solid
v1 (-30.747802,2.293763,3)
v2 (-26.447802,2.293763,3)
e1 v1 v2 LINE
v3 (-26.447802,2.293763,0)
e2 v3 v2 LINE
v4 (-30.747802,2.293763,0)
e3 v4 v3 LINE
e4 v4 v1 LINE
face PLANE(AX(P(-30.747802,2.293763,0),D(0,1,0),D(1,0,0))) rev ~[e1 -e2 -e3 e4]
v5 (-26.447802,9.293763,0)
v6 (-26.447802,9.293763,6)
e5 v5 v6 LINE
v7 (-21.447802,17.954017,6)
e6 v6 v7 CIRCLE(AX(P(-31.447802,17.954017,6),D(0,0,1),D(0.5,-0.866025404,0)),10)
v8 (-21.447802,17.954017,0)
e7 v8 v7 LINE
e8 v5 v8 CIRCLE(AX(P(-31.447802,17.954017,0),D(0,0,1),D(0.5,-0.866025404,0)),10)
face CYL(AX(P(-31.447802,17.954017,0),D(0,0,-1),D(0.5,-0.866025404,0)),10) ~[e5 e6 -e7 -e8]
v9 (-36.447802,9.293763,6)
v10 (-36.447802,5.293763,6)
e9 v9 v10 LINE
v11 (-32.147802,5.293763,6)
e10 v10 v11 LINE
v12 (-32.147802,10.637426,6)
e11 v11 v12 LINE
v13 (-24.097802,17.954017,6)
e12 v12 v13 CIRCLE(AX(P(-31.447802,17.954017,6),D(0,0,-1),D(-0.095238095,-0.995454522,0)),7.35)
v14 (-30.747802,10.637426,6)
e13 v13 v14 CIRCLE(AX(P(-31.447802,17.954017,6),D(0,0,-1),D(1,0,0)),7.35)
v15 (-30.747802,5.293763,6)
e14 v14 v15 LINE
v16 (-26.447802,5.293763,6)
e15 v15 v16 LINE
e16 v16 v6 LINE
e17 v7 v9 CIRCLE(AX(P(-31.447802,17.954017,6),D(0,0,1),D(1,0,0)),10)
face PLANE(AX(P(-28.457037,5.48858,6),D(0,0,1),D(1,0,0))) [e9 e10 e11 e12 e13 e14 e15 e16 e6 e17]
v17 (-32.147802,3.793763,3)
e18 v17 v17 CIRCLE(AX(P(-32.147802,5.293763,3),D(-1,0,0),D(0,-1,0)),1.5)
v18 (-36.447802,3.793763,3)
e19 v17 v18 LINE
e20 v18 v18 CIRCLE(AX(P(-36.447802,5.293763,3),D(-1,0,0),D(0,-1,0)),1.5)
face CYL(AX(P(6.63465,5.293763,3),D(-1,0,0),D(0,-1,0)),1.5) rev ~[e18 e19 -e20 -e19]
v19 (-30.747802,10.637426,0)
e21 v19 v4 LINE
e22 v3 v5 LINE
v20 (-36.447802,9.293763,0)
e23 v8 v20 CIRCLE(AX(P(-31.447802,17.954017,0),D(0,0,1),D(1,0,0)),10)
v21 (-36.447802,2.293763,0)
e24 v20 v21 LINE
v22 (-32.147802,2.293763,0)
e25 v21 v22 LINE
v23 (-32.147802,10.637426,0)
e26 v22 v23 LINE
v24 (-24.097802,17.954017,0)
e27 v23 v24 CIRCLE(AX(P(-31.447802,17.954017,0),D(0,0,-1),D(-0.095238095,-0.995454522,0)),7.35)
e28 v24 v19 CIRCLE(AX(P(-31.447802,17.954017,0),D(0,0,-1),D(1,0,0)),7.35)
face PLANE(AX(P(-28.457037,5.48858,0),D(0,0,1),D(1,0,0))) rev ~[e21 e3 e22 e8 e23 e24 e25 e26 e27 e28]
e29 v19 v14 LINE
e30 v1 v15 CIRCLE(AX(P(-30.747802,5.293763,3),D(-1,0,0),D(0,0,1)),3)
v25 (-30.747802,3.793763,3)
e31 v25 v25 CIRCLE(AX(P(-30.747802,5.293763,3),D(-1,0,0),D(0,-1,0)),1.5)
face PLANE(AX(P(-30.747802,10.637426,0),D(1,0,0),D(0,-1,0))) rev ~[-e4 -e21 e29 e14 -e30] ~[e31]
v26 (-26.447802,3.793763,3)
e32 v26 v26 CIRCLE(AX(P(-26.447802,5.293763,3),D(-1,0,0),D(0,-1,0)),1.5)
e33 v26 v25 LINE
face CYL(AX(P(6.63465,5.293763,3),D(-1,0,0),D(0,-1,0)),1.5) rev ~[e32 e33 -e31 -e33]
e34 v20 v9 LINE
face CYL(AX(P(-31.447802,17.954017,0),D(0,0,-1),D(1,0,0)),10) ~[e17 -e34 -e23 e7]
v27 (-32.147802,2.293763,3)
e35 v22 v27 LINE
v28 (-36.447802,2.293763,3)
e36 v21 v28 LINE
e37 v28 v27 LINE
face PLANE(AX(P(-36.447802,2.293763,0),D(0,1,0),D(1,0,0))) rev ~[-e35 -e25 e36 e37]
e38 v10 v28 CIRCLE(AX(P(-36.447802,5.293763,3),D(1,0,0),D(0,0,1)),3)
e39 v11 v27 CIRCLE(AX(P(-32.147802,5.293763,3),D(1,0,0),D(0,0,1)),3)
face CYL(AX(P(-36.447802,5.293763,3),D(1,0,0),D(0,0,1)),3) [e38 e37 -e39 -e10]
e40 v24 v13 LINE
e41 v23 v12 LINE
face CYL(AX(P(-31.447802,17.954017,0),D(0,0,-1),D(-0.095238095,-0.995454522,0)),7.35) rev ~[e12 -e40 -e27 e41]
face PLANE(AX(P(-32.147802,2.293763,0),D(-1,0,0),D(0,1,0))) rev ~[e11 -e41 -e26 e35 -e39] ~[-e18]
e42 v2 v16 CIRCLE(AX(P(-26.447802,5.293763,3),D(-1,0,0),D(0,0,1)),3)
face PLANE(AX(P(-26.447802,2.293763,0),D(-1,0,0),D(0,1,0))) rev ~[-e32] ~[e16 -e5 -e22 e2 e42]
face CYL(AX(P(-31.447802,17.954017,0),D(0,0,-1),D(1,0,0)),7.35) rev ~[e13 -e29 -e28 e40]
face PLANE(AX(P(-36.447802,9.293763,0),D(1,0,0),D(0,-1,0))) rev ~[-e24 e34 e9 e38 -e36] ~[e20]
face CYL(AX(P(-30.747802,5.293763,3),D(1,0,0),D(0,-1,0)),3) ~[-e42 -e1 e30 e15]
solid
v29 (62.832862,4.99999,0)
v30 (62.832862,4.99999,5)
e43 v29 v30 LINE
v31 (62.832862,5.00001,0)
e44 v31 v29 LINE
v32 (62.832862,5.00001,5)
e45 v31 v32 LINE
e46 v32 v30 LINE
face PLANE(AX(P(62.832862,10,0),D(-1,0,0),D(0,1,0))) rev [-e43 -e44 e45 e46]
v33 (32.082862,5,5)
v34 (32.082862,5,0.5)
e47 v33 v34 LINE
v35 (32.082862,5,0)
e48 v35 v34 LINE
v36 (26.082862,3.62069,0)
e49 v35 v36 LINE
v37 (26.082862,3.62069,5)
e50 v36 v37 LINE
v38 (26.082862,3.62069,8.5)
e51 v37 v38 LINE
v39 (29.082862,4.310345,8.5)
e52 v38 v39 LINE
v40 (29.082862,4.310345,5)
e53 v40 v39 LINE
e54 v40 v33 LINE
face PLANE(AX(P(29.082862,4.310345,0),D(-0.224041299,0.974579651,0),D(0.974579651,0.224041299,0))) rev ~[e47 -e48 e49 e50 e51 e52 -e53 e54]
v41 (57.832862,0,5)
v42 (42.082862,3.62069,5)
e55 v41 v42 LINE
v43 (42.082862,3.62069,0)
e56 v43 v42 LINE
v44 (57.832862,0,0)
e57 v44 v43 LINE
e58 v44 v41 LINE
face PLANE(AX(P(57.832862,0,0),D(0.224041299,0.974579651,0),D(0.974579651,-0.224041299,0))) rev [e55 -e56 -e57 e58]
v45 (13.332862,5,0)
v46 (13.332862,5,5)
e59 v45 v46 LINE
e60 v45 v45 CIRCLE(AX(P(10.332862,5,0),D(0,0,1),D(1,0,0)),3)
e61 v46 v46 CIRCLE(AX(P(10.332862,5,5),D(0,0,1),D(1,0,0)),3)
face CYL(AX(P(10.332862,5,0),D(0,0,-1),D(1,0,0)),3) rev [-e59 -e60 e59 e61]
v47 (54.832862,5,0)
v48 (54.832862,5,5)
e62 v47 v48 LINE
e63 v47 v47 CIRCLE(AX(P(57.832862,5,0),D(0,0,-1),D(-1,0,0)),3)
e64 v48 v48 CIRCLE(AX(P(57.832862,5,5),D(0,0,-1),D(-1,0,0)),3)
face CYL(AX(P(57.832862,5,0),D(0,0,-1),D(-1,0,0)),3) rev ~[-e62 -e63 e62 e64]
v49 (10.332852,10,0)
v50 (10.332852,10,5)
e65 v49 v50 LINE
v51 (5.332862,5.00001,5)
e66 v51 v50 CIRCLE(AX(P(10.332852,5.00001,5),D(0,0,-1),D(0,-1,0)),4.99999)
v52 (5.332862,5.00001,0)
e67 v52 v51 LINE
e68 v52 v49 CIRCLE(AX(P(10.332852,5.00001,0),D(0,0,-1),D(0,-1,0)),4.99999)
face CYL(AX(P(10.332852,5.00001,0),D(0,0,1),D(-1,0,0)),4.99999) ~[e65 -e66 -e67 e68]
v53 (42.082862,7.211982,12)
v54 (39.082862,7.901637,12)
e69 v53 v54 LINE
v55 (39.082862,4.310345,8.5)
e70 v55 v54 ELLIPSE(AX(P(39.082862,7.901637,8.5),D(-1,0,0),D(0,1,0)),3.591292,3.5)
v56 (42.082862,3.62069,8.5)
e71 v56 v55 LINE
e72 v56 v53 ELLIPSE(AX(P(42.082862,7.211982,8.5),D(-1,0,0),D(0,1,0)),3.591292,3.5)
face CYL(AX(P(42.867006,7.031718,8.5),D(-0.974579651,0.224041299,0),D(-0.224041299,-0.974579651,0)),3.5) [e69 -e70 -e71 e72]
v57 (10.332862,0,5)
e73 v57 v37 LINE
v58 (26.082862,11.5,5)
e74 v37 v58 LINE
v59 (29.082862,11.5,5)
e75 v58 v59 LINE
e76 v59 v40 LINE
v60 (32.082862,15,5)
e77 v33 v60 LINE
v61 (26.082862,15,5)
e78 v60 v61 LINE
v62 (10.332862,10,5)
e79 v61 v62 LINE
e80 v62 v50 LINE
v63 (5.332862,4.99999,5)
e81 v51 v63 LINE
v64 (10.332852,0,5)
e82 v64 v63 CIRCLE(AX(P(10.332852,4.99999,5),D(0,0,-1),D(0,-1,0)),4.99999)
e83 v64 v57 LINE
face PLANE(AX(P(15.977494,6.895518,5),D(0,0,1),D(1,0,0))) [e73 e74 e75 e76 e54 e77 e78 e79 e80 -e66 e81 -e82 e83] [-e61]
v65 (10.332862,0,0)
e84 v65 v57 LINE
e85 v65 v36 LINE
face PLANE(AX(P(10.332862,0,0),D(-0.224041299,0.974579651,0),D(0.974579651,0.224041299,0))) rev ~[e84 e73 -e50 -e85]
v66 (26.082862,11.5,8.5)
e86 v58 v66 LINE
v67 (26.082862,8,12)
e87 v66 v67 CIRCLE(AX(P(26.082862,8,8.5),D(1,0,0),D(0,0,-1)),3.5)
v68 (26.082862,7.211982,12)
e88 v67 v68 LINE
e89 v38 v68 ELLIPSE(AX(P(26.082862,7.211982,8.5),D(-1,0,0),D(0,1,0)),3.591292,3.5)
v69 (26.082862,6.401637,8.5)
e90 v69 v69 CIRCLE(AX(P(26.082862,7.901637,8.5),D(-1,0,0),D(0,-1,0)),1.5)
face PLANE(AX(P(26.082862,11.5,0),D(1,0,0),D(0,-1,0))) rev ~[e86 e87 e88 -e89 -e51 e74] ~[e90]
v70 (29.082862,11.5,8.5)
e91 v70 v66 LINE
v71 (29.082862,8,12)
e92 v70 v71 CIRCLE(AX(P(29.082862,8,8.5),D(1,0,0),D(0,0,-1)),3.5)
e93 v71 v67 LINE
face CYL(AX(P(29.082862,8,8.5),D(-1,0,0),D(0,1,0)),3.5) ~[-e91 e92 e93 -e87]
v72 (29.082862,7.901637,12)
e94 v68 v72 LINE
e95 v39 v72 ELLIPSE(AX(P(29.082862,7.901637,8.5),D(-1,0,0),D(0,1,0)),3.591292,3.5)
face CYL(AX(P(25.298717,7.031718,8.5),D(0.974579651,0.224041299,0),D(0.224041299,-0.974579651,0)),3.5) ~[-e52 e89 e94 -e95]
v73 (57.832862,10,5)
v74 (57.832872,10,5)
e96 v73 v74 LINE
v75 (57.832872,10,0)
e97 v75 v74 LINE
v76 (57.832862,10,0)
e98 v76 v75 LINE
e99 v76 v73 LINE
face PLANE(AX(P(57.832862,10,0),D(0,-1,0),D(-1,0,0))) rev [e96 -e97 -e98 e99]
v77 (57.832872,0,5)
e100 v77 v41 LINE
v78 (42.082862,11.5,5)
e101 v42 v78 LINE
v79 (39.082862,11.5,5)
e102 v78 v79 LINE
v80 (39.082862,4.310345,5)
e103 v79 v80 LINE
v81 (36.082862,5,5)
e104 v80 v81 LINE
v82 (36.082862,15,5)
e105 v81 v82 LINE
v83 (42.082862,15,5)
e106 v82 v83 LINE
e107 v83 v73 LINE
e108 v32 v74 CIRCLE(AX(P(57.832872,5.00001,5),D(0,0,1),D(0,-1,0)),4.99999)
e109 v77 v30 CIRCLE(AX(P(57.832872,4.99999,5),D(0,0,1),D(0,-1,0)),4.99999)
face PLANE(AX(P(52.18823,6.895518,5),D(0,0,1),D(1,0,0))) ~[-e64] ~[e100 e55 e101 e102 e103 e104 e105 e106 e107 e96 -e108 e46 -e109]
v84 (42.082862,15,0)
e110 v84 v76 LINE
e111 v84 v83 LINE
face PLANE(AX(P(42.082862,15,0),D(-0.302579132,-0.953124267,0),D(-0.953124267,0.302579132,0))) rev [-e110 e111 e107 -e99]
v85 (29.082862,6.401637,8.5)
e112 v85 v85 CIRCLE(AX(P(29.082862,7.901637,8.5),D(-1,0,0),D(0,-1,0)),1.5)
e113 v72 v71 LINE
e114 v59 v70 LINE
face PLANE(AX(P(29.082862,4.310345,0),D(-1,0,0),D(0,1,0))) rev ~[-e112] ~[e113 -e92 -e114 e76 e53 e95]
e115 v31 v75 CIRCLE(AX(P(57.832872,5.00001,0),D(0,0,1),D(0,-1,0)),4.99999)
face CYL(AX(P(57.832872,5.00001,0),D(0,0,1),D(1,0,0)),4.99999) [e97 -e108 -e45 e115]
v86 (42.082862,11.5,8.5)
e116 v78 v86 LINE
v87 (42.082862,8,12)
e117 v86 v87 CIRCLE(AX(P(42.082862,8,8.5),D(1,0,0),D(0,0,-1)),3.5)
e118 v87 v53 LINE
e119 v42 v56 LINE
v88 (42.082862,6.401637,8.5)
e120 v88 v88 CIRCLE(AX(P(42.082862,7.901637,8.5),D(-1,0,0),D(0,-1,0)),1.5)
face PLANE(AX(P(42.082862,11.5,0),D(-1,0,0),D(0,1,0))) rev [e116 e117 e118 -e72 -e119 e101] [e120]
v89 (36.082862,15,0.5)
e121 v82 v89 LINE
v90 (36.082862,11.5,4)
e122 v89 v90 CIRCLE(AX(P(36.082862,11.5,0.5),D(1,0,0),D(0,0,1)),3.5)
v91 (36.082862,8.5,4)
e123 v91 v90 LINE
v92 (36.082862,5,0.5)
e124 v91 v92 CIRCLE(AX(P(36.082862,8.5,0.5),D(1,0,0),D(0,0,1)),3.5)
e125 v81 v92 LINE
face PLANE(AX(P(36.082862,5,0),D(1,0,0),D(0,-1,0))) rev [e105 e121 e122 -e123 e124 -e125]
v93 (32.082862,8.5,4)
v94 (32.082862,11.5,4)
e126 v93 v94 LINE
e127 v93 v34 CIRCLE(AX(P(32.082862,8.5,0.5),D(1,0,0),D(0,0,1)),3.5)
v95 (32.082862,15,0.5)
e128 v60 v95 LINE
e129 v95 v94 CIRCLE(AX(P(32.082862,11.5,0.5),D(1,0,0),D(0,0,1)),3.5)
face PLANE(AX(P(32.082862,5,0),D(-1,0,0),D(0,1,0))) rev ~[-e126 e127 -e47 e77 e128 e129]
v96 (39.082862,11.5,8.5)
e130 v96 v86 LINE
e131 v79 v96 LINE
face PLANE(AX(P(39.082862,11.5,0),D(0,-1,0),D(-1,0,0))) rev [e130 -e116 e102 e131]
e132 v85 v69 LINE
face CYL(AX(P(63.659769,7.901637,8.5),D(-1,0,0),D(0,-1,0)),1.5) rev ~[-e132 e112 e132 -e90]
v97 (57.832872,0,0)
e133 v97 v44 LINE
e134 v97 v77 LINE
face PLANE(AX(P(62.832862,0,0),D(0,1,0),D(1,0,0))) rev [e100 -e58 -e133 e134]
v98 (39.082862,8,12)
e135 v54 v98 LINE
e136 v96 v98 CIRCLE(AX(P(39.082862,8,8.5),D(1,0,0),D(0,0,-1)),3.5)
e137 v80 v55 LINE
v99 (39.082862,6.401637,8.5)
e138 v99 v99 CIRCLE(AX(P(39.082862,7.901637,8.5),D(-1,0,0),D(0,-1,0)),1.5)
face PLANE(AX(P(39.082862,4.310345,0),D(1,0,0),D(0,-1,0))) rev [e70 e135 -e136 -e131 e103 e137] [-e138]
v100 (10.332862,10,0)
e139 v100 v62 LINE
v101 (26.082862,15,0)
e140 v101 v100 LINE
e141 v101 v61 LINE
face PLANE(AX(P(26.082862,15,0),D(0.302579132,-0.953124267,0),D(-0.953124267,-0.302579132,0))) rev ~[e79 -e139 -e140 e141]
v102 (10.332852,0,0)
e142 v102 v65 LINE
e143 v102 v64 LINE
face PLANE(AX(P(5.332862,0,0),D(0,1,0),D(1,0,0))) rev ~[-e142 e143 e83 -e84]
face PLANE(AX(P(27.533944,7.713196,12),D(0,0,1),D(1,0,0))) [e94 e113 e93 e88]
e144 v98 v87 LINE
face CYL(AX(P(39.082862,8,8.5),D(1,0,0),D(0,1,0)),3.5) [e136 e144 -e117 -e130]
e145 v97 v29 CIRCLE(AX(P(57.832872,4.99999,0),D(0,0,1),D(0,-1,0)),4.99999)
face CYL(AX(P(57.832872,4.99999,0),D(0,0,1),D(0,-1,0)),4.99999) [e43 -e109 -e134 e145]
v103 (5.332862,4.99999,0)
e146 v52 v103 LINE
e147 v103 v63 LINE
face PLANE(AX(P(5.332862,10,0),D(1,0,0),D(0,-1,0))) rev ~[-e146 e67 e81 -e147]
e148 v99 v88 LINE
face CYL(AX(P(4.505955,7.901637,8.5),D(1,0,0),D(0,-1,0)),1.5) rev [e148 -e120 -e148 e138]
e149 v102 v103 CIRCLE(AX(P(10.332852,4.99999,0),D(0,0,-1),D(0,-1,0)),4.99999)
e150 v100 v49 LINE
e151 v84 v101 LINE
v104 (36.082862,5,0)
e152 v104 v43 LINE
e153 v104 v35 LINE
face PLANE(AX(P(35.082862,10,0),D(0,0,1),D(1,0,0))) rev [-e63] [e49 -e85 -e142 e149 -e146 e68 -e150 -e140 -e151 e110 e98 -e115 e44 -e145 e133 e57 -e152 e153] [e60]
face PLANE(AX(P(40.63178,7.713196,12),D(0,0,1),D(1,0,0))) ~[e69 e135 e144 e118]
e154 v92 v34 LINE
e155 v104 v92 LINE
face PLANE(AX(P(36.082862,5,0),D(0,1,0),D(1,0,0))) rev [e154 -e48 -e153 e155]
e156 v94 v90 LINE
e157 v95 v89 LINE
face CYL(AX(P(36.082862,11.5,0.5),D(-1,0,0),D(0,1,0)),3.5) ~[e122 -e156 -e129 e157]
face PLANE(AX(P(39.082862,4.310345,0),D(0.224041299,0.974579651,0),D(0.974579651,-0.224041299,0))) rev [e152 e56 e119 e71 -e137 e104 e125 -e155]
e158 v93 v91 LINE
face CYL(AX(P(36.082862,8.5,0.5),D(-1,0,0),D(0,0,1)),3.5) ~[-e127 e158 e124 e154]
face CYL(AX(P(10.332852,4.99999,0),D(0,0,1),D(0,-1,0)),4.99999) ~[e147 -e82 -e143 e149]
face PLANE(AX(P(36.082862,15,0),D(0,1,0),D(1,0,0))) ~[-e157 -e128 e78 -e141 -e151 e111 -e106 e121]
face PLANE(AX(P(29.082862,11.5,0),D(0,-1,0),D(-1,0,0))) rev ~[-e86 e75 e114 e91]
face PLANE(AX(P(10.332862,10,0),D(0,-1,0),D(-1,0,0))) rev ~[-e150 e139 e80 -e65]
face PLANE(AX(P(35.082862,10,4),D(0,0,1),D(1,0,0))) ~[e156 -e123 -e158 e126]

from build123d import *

# Parameters (mm, degrees)
F1_DEPTH = 6
F3_D     = 3
F5_DEPTH = 12
F4_R     = 3
F4_W     = 3
F4_H     = 3.5
F6_DEPTH = 5
F4_W_2   = 2
F4_H_2   = 10
F7_DEPTH = 4
F8_R     = 4.99999
F9_R     = 3.5
F11_D    = 3
F13_R    = 3


# Not quite as in the source:
# - a fillet or chamfer is up to 0.001 mm smaller than in the source, because OpenCascade refuses the exact size
# - a feature names something its author has since deleted; it is built from what else it names


with BuildPart() as f1:
    # F0 (on Top) → F1 (new body)
    with BuildSketch(Plane.XY):
        with BuildLine():
            ThreePointArc((-26.4478022211, 9.2937625569), (-28.5229179157, 8.3913259797), (-30.7478022211, 7.978546681))
            Line((-30.7478022211, 7.978546681), (-30.7478022211, 2.2937625569))
            Line((-30.7478022211, 2.2937625569), (-26.4478022211, 2.2937625569))
            Line((-26.4478022211, 2.2937625569), (-26.4478022211, 9.2937625569))
        make_face()
        with BuildLine():
            Line((-32.1478022211, 2.2937625569), (-32.1478022211, 7.978546681))
            ThreePointArc((-32.1478022211, 7.978546681), (-34.3726865265, 8.3913259797), (-36.4478022211, 9.2937625569))
            Line((-36.4478022211, 9.2937625569), (-36.4478022211, 2.2937625569))
            Line((-36.4478022211, 2.2937625569), (-32.1478022211, 2.2937625569))
        make_face()
        with BuildLine():
            ThreePointArc((-32.1478022211, 10.6374258586), (-36.3913586332, 23.3931111885), (-24.0978022211, 17.9540165948))
            ThreePointArc((-24.0978022211, 17.9540165948), (-26.0087076273, 13.0104601826), (-30.7478022211, 10.6374258586))
            Line((-30.7478022211, 10.6374258586), (-30.7478022211, 7.978546681))
            ThreePointArc((-30.7478022211, 7.978546681), (-28.5229179157, 8.3913259797), (-26.4478022211, 9.2937625569))
            ThreePointArc((-26.4478022211, 9.2937625569), (-22.7875481833, 12.9540165948), (-21.4478022211, 17.9540165948))
            ThreePointArc((-21.4478022211, 17.9540165948), (-36.4478022211, 26.6142706326), (-36.4478022211, 9.2937625569))
            ThreePointArc((-36.4478022211, 9.2937625569), (-34.3726865265, 8.3913259797), (-32.1478022211, 7.978546681))
            Line((-32.1478022211, 7.978546681), (-32.1478022211, 10.6374258586))
        make_face()
    extrude(amount=F1_DEPTH)

    # F3 (through all)
    with Locations(Plane.YZ.offset(-26.4478022211)):
        with Locations((5.2937625569, 3)):
            Hole(F3_D / 2)

    # F13
    f13_edges = [f1.edges().sort_by_distance(p)[0] for p in [
        (-34.297802, 2.293763, 6),
        (-28.597802, 2.293763, 6),
    ]]
    fillet(f13_edges, radius=F13_R)


with BuildPart() as f5:
    # F4 (on Top) → F5 (new body)
    with BuildSketch(Plane.XY):
        Polygon((26.0828619152, 5), (26.0828619152, 3.6206896552), (29.0828619152, 4.3103448276), (29.0828619152, 5), (29.0828619152, 11.5), (26.0828619152, 11.5), align=None)
    extrude(amount=F5_DEPTH)

    # F4 (on Top) → F6 (join)
    with BuildSketch(Plane.XY):
        Polygon((10.3328619152, 10), (5.3328619152, 10), (5.3328619152, 0), (10.3328619152, 0), (26.0828619152, 3.6206896552), (26.0828619152, 5), (26.0828619152, 11.5), (26.0828619152, 15), align=None)
        with Locations((10.3328619152, 5)):
            Circle(F4_R, mode=Mode.SUBTRACT)
        Polygon((32.0828619152, 15), (29.0828619152, 15), (29.0828619152, 11.5), (29.0828619152, 5), (29.0828619152, 4.3103448276), (32.0828619152, 5), align=None)
        with Locations((27.5828619152, 13.25)):
            Rectangle(F4_W, F4_H)
    extrude(amount=F6_DEPTH)

    # F4 (on Top) → F7 (join)
    with BuildSketch(Plane.XY):
        with Locations((33.0828619152, 10)):
            Rectangle(F4_W_2, F4_H_2)
    extrude(amount=F7_DEPTH)

    # F8 (radius 5 in the source; OpenCascade refuses exactly that, so slightly less here)
    f8_edges = [f5.edges().sort_by_distance(p)[0] for p in [
        (5.332862, 0, 2.5),
        (5.332862, 10, 2.5),
    ]]
    fillet(f8_edges, radius=F8_R)

    # F9
    f9_edges = [f5.edges().sort_by_distance(p)[0] for p in [
        (33.082862, 15, 4),
        (33.082862, 5, 4),
        (27.582862, 11.5, 12),
        (27.582862, 3.965517, 12),
    ]]
    fillet(f9_edges, radius=F9_R)

    # F11 (through all)
    with Locations(Plane.YZ.offset(29.0828619152)):
        with Locations((7.9016367206, 8.5)):
            Hole(F11_D / 2)

    # F12: F5 across face


with BuildPart() as f5_1:
    add(f5.part)
    add(f5.part.mirror(Plane(origin=(34.0828619152, 10, 1.8156409487), x_dir=(0, 1, 0), z_dir=(1, 0, 0))))


solid = Compound([f1.part, f5_1.part])
